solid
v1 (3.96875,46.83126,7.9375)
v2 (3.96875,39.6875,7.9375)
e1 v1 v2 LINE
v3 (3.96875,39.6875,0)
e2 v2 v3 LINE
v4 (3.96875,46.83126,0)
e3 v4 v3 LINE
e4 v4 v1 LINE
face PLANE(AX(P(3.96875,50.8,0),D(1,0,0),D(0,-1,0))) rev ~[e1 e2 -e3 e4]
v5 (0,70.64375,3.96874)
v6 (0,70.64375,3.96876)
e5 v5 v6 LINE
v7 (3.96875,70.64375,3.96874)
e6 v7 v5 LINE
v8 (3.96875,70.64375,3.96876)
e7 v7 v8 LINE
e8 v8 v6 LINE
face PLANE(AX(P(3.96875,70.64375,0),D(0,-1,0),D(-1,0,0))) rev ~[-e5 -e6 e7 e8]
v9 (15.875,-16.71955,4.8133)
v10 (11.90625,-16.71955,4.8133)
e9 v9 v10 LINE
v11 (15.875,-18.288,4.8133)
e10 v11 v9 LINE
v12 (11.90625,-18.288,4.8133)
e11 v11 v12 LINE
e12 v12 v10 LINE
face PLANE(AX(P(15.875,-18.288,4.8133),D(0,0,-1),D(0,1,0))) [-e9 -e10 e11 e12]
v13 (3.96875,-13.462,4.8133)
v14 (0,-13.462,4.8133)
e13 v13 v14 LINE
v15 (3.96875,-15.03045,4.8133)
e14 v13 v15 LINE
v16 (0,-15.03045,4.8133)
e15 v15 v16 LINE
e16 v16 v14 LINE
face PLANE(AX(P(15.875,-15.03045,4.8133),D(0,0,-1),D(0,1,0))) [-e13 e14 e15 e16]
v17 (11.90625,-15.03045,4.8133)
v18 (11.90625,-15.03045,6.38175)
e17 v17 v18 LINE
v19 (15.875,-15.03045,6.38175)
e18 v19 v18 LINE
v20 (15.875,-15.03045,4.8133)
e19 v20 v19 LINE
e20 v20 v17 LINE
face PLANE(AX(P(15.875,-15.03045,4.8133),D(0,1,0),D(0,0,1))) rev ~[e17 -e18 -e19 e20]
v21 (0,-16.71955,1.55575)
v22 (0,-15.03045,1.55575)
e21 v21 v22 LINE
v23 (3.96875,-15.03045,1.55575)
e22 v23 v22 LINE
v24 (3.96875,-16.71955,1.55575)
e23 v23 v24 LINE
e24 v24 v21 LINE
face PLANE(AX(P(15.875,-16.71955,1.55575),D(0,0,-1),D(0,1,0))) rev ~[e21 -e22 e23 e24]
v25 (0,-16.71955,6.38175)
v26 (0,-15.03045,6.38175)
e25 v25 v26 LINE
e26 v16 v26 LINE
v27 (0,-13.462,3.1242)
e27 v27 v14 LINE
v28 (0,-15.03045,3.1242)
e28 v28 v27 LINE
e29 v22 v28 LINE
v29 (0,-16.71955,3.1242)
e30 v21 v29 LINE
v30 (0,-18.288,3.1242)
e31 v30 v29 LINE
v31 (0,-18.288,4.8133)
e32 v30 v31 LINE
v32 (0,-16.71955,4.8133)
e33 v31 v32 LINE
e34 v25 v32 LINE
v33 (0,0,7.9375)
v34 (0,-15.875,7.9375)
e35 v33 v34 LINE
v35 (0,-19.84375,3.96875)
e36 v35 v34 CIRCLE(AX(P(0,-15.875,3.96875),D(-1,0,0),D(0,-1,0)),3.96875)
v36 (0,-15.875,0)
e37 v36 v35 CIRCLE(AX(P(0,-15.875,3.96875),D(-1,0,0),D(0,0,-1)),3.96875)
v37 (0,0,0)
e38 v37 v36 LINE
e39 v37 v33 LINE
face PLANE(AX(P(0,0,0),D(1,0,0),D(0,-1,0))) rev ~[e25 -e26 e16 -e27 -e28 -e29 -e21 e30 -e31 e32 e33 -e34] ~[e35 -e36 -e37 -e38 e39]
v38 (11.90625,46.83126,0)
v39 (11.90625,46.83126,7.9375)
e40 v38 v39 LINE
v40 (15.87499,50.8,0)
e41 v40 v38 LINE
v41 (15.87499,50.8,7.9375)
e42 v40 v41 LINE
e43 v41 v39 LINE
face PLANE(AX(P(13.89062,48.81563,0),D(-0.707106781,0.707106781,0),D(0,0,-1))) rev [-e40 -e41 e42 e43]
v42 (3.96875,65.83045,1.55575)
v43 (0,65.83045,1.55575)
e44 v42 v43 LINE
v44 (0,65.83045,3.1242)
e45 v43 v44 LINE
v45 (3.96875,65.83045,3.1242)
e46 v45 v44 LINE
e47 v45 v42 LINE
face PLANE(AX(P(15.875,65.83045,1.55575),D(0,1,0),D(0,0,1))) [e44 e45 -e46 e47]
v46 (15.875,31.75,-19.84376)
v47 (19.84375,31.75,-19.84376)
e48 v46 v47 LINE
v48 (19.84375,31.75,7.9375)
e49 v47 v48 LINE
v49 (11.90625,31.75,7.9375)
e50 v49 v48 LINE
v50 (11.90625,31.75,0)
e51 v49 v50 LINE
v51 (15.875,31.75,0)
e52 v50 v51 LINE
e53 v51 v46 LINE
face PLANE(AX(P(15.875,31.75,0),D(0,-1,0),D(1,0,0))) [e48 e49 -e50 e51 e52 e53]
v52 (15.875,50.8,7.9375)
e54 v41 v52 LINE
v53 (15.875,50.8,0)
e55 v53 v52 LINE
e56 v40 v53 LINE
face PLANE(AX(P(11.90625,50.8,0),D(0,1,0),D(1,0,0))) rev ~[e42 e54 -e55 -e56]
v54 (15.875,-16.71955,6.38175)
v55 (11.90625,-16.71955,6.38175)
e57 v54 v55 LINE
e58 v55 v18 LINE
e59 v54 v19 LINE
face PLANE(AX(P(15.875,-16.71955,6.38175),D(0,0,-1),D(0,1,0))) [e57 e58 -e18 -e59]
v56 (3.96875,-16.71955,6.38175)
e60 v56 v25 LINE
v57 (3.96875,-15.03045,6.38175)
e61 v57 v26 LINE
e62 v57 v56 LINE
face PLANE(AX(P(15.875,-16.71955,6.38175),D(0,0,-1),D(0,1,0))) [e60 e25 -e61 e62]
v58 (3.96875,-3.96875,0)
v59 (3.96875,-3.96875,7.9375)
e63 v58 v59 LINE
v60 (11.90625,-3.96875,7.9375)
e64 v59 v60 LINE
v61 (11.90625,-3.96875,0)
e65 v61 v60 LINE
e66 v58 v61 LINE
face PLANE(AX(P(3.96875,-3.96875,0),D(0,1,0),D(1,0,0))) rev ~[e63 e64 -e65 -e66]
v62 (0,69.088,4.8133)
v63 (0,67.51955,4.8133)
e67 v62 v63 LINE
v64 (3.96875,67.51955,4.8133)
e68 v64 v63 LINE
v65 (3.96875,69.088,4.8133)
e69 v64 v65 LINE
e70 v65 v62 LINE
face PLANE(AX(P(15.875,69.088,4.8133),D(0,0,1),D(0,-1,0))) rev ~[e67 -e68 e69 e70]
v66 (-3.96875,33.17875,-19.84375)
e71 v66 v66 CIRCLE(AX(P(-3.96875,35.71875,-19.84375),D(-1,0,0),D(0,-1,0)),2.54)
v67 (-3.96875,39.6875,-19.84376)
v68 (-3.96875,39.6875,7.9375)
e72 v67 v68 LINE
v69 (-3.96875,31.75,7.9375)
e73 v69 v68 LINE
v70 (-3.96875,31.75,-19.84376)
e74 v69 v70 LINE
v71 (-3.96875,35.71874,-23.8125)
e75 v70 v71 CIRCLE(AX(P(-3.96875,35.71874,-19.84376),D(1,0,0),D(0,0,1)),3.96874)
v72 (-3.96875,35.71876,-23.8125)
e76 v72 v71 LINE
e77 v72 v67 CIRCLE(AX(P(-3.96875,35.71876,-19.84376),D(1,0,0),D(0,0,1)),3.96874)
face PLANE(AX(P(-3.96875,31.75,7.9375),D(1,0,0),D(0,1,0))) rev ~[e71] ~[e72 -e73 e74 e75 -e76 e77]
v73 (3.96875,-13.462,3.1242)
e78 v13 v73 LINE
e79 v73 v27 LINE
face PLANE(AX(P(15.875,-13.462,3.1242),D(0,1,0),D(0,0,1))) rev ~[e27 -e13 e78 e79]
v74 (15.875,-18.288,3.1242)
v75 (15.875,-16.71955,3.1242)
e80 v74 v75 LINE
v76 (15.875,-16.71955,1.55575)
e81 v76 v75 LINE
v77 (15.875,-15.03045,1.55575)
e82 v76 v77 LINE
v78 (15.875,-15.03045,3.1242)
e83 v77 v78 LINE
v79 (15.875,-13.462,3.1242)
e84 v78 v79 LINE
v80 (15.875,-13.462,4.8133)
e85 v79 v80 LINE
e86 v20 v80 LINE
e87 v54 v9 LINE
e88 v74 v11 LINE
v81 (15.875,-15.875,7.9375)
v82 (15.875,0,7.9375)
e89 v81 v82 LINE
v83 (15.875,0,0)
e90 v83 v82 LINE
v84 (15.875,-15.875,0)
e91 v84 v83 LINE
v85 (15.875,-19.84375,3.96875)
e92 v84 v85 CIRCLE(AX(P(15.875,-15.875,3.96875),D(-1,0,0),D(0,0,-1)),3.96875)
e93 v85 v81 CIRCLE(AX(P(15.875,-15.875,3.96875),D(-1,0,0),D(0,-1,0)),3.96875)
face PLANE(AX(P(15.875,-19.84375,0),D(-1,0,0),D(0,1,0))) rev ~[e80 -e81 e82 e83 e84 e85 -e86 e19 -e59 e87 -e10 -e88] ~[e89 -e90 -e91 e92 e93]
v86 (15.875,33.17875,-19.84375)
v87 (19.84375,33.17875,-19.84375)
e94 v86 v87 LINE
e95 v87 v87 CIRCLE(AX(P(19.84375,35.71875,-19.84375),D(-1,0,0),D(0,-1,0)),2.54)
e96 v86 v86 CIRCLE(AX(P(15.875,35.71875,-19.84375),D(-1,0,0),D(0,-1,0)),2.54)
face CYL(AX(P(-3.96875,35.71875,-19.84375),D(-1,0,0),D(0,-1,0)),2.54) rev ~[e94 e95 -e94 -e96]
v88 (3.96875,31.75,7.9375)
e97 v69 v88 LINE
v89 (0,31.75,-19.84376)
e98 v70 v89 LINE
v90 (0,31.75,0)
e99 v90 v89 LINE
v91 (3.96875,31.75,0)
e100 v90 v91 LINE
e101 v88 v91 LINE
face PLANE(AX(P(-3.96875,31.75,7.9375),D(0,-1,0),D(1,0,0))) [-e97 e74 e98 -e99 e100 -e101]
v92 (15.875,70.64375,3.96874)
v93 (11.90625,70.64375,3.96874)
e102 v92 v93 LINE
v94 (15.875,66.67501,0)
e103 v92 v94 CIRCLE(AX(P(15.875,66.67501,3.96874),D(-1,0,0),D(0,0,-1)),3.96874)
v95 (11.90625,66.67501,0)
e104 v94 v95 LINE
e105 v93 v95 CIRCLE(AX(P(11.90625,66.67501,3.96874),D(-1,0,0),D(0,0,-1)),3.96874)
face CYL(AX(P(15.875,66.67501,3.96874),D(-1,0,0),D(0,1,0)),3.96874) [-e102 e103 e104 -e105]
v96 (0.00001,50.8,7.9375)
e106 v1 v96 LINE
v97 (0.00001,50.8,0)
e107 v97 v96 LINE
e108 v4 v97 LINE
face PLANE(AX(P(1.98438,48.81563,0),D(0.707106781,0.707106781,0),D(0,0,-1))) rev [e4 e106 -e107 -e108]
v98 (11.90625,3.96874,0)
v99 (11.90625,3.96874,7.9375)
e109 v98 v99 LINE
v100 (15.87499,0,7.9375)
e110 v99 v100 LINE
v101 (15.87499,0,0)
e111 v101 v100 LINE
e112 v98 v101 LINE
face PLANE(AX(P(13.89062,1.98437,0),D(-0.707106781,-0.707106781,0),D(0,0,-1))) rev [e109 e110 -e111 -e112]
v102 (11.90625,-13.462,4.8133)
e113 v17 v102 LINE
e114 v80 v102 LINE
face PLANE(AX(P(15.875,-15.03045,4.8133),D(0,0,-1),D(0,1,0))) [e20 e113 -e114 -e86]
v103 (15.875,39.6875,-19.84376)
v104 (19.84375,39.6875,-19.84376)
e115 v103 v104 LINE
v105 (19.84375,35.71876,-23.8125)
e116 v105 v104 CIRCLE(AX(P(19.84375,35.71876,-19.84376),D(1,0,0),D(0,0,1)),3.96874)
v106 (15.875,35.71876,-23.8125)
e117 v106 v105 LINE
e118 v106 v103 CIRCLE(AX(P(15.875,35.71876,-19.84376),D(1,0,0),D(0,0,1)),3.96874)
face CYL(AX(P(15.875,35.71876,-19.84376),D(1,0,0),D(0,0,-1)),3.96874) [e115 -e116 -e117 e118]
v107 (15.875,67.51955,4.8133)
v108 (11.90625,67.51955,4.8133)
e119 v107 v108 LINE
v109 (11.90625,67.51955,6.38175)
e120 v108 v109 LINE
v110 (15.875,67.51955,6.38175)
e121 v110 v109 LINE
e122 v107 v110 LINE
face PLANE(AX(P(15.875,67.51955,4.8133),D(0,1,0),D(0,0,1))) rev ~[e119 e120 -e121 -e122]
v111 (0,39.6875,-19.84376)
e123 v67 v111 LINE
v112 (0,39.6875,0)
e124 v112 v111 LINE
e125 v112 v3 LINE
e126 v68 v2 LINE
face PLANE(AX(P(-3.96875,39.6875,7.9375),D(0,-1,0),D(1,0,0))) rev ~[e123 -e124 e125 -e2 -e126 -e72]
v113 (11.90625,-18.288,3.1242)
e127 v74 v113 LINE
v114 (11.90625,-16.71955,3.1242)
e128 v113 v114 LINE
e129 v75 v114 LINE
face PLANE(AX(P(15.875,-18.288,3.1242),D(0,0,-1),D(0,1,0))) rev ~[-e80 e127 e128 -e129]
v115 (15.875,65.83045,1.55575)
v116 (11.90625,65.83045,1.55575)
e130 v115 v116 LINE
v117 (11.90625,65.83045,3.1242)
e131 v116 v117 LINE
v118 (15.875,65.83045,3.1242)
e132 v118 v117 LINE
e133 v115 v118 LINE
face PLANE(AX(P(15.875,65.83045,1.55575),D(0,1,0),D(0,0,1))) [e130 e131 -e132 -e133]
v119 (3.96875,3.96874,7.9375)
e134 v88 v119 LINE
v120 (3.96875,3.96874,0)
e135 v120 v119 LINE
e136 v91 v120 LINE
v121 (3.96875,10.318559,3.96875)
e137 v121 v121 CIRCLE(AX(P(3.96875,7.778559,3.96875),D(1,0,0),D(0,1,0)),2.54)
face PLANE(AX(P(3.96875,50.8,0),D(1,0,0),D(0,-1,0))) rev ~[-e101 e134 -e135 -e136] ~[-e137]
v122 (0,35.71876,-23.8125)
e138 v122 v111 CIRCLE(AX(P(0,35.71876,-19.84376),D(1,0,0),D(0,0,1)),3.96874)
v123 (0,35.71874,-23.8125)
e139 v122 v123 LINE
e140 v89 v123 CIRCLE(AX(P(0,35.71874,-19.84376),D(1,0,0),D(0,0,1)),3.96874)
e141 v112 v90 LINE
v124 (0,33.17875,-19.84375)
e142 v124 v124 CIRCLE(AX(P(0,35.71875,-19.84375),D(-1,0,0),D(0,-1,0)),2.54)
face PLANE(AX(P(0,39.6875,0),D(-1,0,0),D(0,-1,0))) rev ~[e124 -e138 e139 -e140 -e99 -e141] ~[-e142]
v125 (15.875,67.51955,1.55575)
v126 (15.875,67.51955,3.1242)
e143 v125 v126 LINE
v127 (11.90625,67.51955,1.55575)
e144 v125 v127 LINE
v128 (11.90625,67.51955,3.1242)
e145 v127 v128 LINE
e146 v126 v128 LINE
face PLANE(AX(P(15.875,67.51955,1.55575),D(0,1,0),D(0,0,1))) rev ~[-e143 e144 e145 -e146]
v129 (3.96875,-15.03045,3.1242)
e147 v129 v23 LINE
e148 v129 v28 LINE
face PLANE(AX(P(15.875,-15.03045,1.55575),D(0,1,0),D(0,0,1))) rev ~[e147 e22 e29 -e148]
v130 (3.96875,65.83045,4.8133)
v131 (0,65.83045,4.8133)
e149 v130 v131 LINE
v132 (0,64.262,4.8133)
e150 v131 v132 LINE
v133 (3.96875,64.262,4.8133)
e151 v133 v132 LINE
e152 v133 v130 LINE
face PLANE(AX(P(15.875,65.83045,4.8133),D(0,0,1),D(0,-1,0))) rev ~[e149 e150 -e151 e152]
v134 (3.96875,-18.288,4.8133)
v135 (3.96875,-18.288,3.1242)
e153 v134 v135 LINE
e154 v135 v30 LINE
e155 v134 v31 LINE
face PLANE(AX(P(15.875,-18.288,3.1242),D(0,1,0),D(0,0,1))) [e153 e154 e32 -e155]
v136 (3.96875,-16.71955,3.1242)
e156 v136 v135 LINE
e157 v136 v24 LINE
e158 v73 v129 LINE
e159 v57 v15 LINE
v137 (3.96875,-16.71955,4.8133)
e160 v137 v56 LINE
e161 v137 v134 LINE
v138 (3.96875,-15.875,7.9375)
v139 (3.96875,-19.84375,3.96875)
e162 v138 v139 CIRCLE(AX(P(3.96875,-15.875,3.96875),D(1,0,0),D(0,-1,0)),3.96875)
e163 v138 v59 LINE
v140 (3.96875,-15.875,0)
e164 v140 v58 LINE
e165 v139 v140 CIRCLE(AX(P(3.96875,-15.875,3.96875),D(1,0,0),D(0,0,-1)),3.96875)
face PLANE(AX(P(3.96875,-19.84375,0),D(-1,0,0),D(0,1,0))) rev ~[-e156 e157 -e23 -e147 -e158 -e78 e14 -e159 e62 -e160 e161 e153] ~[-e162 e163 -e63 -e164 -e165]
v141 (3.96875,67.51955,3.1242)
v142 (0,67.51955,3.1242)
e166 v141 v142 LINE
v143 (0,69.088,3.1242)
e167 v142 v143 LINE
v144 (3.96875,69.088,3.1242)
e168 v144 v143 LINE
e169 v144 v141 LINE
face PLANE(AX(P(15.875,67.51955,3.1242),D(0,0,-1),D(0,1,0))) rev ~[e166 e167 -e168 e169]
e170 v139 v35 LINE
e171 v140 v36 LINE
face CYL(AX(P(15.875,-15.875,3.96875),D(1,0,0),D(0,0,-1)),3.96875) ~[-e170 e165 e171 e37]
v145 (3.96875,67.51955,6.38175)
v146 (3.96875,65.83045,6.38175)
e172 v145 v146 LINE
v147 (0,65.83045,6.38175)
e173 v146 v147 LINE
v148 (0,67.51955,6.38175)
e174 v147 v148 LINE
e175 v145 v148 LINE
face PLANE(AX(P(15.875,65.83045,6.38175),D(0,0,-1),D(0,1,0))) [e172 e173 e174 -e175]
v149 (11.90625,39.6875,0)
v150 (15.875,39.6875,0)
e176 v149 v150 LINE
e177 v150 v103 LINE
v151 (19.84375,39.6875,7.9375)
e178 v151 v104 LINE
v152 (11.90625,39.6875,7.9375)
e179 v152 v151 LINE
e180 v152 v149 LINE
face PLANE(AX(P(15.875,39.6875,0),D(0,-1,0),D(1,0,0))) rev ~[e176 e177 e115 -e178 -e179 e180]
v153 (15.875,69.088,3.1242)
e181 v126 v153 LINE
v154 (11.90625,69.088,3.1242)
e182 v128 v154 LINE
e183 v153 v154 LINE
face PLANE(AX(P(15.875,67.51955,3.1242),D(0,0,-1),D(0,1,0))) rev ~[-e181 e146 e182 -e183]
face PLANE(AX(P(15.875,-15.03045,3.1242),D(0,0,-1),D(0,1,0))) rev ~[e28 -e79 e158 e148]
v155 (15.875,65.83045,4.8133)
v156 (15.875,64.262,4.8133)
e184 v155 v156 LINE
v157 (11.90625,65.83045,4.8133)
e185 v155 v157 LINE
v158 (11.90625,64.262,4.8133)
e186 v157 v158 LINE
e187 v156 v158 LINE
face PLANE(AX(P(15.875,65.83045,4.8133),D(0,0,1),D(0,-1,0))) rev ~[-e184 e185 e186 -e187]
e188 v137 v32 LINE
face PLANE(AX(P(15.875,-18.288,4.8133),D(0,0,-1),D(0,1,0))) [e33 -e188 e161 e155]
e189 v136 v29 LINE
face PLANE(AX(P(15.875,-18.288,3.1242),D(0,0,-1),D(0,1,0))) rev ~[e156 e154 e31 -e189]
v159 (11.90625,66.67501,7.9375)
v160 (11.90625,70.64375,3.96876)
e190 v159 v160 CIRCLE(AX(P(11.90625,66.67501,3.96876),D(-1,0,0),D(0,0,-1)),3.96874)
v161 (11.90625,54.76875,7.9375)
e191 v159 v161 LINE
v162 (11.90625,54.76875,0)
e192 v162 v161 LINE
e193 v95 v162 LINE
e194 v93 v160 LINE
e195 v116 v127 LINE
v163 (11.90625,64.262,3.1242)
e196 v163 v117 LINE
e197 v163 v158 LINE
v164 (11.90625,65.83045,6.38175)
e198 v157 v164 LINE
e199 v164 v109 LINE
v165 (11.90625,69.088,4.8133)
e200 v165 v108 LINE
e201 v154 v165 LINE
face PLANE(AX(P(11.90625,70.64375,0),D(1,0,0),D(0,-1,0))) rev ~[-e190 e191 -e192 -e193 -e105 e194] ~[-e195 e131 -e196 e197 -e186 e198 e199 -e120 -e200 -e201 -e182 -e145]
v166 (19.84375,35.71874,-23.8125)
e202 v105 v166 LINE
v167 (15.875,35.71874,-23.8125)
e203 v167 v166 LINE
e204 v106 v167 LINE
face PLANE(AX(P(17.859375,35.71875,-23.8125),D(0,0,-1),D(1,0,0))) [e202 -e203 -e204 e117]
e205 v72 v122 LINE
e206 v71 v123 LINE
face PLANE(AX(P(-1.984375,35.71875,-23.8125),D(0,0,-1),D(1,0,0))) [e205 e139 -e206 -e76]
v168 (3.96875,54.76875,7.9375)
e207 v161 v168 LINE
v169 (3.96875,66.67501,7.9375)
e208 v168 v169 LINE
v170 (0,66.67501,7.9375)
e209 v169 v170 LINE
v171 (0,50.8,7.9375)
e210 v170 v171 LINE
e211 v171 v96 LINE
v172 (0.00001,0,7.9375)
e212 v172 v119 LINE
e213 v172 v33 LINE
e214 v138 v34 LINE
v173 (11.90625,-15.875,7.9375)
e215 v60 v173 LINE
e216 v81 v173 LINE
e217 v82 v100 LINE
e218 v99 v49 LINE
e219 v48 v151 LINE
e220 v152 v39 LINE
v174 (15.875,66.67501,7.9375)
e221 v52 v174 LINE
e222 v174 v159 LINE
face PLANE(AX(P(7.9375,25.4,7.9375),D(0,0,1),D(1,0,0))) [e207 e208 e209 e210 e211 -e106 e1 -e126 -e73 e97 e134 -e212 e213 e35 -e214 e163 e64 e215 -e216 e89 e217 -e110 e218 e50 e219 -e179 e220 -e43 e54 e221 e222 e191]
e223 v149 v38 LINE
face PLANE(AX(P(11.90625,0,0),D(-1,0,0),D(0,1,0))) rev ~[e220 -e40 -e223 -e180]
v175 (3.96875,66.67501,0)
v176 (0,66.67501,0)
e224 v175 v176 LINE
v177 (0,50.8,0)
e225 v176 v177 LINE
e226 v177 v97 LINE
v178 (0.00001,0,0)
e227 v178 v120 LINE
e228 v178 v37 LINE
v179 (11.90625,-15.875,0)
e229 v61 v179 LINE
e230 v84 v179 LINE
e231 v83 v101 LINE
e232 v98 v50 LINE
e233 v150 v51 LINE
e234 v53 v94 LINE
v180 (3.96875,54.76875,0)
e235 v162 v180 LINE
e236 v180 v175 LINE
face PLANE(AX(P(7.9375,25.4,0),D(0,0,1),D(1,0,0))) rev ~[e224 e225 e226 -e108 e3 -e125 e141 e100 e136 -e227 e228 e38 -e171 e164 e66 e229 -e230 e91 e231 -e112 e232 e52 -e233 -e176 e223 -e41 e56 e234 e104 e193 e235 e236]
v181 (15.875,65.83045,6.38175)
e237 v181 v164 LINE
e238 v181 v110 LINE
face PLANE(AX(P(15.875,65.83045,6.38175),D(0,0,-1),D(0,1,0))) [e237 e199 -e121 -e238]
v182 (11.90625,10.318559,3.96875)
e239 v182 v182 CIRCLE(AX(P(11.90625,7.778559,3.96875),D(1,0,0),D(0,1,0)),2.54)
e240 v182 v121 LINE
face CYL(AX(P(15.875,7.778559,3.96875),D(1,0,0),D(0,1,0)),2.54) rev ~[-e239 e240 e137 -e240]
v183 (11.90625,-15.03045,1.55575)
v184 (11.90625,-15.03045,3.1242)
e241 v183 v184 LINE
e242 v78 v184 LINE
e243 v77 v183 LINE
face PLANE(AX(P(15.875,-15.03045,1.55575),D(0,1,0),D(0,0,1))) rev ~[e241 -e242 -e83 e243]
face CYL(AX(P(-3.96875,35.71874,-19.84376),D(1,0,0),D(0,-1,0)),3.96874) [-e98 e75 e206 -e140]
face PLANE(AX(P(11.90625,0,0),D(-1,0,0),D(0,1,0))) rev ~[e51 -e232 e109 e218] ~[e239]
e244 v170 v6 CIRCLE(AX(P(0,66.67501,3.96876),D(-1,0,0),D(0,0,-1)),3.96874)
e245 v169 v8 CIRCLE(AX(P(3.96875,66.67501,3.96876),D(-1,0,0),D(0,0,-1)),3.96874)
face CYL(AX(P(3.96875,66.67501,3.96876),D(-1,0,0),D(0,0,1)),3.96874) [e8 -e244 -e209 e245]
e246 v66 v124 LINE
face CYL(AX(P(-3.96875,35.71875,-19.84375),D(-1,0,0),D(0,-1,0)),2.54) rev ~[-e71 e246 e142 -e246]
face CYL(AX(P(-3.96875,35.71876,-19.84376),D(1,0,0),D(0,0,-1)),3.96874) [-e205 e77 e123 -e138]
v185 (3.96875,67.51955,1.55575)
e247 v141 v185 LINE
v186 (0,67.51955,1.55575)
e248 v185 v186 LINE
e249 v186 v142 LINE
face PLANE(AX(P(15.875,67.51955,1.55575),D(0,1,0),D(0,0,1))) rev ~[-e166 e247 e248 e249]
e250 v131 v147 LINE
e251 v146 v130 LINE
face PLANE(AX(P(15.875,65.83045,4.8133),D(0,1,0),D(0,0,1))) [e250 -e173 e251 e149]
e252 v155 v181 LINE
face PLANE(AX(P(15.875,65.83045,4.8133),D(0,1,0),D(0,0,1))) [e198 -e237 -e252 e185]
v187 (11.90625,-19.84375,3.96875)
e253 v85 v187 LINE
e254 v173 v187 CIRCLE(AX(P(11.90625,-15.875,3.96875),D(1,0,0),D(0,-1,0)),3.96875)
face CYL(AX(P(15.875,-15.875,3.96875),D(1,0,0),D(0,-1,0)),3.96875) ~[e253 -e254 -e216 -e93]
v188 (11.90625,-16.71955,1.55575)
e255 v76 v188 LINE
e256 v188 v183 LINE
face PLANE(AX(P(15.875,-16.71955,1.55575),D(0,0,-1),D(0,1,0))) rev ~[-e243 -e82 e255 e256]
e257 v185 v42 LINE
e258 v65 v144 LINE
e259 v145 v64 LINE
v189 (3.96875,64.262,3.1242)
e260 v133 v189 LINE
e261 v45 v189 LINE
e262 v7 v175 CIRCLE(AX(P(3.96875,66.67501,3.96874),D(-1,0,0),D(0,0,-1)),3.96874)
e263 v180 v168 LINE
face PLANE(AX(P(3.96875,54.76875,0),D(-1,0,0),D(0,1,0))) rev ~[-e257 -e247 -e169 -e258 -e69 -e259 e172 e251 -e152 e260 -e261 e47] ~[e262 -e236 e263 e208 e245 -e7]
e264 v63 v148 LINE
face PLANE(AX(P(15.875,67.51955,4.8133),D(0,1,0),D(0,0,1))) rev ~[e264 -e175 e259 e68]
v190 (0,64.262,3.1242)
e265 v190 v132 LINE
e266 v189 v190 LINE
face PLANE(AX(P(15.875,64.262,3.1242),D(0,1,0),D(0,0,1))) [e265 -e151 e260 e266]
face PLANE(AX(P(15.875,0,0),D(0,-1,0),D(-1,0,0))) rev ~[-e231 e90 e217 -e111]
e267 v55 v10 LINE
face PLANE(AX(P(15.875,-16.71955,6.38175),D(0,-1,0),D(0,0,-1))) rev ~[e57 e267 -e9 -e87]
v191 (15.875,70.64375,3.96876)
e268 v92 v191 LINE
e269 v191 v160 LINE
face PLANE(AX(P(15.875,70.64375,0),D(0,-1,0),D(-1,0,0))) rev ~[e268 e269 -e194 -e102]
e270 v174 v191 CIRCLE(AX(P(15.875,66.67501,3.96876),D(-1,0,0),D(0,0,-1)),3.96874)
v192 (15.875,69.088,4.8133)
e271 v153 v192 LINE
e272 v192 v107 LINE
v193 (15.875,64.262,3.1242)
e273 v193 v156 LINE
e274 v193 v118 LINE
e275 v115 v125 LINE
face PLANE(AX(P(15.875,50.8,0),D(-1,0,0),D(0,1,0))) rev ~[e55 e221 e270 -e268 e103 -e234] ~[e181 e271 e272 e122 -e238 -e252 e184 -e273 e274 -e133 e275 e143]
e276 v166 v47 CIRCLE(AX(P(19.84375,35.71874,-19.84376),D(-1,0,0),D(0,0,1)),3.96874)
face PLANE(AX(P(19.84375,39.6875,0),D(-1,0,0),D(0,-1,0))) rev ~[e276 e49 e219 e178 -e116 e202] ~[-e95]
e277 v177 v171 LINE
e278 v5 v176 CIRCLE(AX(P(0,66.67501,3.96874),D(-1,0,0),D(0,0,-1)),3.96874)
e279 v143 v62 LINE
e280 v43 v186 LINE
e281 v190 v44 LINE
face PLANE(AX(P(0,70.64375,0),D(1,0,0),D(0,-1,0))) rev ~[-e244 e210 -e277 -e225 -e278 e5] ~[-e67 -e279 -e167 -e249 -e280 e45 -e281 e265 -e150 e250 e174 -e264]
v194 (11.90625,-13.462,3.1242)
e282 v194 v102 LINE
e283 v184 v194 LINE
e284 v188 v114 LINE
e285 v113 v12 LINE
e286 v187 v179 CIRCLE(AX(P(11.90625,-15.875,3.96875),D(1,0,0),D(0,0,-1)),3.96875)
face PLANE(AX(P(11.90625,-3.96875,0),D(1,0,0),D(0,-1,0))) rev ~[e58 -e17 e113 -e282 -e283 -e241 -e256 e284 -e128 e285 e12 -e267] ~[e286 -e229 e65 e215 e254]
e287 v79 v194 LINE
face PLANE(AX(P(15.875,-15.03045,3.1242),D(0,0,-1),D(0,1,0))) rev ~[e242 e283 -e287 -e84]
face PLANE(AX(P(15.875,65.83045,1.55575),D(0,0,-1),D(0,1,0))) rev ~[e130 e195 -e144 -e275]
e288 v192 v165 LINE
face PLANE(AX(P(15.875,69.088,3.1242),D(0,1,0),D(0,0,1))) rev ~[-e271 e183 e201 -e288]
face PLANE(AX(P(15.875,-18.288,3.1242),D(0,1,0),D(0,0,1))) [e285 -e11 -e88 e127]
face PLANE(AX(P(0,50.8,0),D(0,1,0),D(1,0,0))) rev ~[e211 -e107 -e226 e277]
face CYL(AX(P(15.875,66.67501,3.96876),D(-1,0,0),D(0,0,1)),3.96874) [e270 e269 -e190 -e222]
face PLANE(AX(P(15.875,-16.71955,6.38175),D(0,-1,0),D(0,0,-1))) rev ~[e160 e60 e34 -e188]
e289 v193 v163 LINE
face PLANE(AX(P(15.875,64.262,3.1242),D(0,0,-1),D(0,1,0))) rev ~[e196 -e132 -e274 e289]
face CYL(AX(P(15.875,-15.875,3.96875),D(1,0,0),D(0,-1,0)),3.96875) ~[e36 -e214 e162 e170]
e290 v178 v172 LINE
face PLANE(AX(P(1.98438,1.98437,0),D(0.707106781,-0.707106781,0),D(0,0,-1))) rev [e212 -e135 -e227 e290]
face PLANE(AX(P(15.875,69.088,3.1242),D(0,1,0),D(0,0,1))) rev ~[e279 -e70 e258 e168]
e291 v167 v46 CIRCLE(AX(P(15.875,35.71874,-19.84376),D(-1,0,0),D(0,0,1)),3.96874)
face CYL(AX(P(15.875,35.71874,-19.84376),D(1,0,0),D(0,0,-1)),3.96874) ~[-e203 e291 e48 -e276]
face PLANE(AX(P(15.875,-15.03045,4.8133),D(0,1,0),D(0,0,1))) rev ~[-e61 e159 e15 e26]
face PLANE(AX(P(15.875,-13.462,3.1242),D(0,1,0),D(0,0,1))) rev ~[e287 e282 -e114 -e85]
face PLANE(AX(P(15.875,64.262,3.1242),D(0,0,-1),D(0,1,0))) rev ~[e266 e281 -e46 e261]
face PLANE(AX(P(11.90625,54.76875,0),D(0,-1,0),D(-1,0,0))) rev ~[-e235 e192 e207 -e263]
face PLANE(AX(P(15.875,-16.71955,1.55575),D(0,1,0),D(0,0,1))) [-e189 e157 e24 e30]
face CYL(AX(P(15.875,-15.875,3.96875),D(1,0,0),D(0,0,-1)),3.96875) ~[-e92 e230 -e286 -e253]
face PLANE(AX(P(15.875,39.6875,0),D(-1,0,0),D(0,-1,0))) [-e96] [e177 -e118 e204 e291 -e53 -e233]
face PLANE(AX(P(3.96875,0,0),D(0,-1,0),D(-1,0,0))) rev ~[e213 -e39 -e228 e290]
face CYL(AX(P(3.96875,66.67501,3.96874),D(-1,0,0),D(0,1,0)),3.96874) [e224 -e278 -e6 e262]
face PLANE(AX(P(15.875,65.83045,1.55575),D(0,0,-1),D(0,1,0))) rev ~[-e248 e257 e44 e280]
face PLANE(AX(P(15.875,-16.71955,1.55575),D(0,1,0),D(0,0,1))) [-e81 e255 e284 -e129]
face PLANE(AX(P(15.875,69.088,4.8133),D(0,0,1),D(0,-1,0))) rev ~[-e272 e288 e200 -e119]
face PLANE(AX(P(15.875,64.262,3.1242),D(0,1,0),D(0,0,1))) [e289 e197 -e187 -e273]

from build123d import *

# Parameters (mm, degrees)
F1_DEPTH  = 7.9375
F2_R      = 2.54
F2_W      = 1.6891
F2_H      = 1.56845
F2_H_2    = 1.6891
F2_W_2    = 1.56845
F3_DEPTH  = 15.875
F4_SIZE   = 3.96874
F5_W      = 7.9375
F5_H      = 7.9375
F6_DEPTH  = 7.9375
F7_W      = 3.96875
F7_H      = 7.9375
F8_DEPTH  = 23.8125
F9_R      = 3.96874
F10_R     = 2.54
F11_DEPTH = 23.8125
F12_W     = 1.6891
F12_H     = 1.56845
F12_W_2   = 1.56845
F12_H_2   = 1.6891
F13_DEPTH = 15.875


# Not quite as in the source:
# - a fillet or chamfer is up to 0.001 mm smaller than in the source, because OpenCascade refuses the exact size


with BuildPart() as f1:
    # F0 (on Top) → F1 (new body)
    with BuildSketch(Plane.XY):
        Polygon((3.96875, 0), (0, 0), (0, -19.84375), (3.96875, -19.84375), (3.96875, -3.96875), (11.90625, -3.96875), (11.90625, -19.84375), (15.875, -19.84375), (15.875, 0), (11.90625, 0), (11.90625, 50.8), (15.875, 50.8), (15.875, 70.64375), (11.90625, 70.64375), (11.90625, 54.76875), (3.96875, 54.76875), (3.96875, 70.64375), (0, 70.64375), (0, 50.8), (3.96875, 50.8), align=None)
    extrude(amount=F1_DEPTH)

    # F2 (on face) → F3 (cut, through all)
    with BuildSketch(Plane.YZ.offset(15.875)):
        with BuildLine():
            ThreePointArc((-15.875, 0), (-18.6813300378, 1.1624199622), (-19.84375, 3.96875))
            Line((-19.84375, 3.96875), (-19.84375, 0))
            Line((-19.84375, 0), (-15.875, 0))
        make_face()
        with BuildLine():
            ThreePointArc((-19.84375, 3.96875), (-18.6813300378, 6.7750800378), (-15.875, 7.9375))
            Line((-15.875, 7.9375), (-19.84375, 7.9375))
            Line((-19.84375, 7.9375), (-19.84375, 3.96875))
        make_face()
        with Locations((7.778559196, 3.96875)):
            Circle(F2_R)
        with Locations((-15.875, 5.597525)):
            Rectangle(F2_W, F2_H)
        with Locations((-15.875, 3.96875)):
            Rectangle(F2_W, F2_H_2)
        with Locations((-17.503775, 3.96875)):
            Rectangle(F2_W_2, F2_H_2)
        with Locations((-14.246225, 3.96875)):
            Rectangle(F2_W_2, F2_H_2)
        with Locations((-15.875, 2.339975)):
            Rectangle(F2_W, F2_H)
    extrude(amount=-F3_DEPTH, mode=Mode.SUBTRACT)

    # F4 (size 3.96875 in the source; OpenCascade refuses exactly that, so slightly less here)
    f4_edges = [f1.edges().sort_by_distance(p)[0] for p in [
        (11.90625, 0, 3.96875),
        (3.96875, 0, 3.96875),
        (11.90625, 50.8, 3.96875),
        (3.96875, 50.8, 3.96875),
    ]]
    chamfer(f4_edges, length=F4_SIZE)

    # F5 (on face) → F6 (join, through all)
    with BuildSketch(Plane.XY.offset(7.9375)):
        with Locations((0, 35.71875)):
            Rectangle(F5_W, F5_H)
        with Locations((15.875, 35.71875)):
            Rectangle(F5_W, F5_H)
    extrude(amount=-F6_DEPTH)

    # F7 (on face) → F8 (join)
    with BuildSketch(Plane(origin=(0, 0, 0), x_dir=(1, 0, 0), z_dir=(0, 0, -1))):
        with Locations((17.859375, -35.71875)):
            Rectangle(F7_W, F7_H)
        with Locations((-1.984375, -35.71875)):
            Rectangle(F7_W, F7_H)
    extrude(amount=F8_DEPTH)

    # F9 (radius 3.96875 in the source; OpenCascade refuses exactly that, so slightly less here)
    f9_edges = [f1.edges().sort_by_distance(p)[0] for p in [
        (-1.984375, 39.6875, -23.8125),
        (-1.984375, 31.75, -23.8125),
        (17.859375, 31.75, -23.8125),
        (17.859375, 39.6875, -23.8125),
        (13.890625, 70.64375, 0),
        (13.890625, 70.64375, 7.9375),
        (1.984375, 70.64375, 7.9375),
        (1.984375, 70.64375, 0),
    ]]
    fillet(f9_edges, radius=F9_R)

    # F10 (on face) → F11 (cut, through all)
    with BuildSketch(Plane(origin=(-3.96875, 0, 0), x_dir=(0, -1, 0), z_dir=(-1, 0, 0))):
        with Locations((-35.71875, -19.84375)):
            Circle(F10_R)
    extrude(amount=-F11_DEPTH, mode=Mode.SUBTRACT)

    # F12 (on face) → F13 (cut, through all)
    with BuildSketch(Plane.YZ.offset(15.875)):
        with Locations((66.675, 2.339975)):
            Rectangle(F12_W, F12_H)
        with Locations((65.046225, 3.96875)):
            Rectangle(F12_W_2, F12_H_2)
        with Locations((66.675, 3.96875)):
            Rectangle(F12_W, F12_H_2)
        with Locations((68.303775, 3.96875)):
            Rectangle(F12_W_2, F12_H_2)
        with Locations((66.675, 5.597525)):
            Rectangle(F12_W, F12_H)
    extrude(amount=-F13_DEPTH, mode=Mode.SUBTRACT)


solid = f1.part
